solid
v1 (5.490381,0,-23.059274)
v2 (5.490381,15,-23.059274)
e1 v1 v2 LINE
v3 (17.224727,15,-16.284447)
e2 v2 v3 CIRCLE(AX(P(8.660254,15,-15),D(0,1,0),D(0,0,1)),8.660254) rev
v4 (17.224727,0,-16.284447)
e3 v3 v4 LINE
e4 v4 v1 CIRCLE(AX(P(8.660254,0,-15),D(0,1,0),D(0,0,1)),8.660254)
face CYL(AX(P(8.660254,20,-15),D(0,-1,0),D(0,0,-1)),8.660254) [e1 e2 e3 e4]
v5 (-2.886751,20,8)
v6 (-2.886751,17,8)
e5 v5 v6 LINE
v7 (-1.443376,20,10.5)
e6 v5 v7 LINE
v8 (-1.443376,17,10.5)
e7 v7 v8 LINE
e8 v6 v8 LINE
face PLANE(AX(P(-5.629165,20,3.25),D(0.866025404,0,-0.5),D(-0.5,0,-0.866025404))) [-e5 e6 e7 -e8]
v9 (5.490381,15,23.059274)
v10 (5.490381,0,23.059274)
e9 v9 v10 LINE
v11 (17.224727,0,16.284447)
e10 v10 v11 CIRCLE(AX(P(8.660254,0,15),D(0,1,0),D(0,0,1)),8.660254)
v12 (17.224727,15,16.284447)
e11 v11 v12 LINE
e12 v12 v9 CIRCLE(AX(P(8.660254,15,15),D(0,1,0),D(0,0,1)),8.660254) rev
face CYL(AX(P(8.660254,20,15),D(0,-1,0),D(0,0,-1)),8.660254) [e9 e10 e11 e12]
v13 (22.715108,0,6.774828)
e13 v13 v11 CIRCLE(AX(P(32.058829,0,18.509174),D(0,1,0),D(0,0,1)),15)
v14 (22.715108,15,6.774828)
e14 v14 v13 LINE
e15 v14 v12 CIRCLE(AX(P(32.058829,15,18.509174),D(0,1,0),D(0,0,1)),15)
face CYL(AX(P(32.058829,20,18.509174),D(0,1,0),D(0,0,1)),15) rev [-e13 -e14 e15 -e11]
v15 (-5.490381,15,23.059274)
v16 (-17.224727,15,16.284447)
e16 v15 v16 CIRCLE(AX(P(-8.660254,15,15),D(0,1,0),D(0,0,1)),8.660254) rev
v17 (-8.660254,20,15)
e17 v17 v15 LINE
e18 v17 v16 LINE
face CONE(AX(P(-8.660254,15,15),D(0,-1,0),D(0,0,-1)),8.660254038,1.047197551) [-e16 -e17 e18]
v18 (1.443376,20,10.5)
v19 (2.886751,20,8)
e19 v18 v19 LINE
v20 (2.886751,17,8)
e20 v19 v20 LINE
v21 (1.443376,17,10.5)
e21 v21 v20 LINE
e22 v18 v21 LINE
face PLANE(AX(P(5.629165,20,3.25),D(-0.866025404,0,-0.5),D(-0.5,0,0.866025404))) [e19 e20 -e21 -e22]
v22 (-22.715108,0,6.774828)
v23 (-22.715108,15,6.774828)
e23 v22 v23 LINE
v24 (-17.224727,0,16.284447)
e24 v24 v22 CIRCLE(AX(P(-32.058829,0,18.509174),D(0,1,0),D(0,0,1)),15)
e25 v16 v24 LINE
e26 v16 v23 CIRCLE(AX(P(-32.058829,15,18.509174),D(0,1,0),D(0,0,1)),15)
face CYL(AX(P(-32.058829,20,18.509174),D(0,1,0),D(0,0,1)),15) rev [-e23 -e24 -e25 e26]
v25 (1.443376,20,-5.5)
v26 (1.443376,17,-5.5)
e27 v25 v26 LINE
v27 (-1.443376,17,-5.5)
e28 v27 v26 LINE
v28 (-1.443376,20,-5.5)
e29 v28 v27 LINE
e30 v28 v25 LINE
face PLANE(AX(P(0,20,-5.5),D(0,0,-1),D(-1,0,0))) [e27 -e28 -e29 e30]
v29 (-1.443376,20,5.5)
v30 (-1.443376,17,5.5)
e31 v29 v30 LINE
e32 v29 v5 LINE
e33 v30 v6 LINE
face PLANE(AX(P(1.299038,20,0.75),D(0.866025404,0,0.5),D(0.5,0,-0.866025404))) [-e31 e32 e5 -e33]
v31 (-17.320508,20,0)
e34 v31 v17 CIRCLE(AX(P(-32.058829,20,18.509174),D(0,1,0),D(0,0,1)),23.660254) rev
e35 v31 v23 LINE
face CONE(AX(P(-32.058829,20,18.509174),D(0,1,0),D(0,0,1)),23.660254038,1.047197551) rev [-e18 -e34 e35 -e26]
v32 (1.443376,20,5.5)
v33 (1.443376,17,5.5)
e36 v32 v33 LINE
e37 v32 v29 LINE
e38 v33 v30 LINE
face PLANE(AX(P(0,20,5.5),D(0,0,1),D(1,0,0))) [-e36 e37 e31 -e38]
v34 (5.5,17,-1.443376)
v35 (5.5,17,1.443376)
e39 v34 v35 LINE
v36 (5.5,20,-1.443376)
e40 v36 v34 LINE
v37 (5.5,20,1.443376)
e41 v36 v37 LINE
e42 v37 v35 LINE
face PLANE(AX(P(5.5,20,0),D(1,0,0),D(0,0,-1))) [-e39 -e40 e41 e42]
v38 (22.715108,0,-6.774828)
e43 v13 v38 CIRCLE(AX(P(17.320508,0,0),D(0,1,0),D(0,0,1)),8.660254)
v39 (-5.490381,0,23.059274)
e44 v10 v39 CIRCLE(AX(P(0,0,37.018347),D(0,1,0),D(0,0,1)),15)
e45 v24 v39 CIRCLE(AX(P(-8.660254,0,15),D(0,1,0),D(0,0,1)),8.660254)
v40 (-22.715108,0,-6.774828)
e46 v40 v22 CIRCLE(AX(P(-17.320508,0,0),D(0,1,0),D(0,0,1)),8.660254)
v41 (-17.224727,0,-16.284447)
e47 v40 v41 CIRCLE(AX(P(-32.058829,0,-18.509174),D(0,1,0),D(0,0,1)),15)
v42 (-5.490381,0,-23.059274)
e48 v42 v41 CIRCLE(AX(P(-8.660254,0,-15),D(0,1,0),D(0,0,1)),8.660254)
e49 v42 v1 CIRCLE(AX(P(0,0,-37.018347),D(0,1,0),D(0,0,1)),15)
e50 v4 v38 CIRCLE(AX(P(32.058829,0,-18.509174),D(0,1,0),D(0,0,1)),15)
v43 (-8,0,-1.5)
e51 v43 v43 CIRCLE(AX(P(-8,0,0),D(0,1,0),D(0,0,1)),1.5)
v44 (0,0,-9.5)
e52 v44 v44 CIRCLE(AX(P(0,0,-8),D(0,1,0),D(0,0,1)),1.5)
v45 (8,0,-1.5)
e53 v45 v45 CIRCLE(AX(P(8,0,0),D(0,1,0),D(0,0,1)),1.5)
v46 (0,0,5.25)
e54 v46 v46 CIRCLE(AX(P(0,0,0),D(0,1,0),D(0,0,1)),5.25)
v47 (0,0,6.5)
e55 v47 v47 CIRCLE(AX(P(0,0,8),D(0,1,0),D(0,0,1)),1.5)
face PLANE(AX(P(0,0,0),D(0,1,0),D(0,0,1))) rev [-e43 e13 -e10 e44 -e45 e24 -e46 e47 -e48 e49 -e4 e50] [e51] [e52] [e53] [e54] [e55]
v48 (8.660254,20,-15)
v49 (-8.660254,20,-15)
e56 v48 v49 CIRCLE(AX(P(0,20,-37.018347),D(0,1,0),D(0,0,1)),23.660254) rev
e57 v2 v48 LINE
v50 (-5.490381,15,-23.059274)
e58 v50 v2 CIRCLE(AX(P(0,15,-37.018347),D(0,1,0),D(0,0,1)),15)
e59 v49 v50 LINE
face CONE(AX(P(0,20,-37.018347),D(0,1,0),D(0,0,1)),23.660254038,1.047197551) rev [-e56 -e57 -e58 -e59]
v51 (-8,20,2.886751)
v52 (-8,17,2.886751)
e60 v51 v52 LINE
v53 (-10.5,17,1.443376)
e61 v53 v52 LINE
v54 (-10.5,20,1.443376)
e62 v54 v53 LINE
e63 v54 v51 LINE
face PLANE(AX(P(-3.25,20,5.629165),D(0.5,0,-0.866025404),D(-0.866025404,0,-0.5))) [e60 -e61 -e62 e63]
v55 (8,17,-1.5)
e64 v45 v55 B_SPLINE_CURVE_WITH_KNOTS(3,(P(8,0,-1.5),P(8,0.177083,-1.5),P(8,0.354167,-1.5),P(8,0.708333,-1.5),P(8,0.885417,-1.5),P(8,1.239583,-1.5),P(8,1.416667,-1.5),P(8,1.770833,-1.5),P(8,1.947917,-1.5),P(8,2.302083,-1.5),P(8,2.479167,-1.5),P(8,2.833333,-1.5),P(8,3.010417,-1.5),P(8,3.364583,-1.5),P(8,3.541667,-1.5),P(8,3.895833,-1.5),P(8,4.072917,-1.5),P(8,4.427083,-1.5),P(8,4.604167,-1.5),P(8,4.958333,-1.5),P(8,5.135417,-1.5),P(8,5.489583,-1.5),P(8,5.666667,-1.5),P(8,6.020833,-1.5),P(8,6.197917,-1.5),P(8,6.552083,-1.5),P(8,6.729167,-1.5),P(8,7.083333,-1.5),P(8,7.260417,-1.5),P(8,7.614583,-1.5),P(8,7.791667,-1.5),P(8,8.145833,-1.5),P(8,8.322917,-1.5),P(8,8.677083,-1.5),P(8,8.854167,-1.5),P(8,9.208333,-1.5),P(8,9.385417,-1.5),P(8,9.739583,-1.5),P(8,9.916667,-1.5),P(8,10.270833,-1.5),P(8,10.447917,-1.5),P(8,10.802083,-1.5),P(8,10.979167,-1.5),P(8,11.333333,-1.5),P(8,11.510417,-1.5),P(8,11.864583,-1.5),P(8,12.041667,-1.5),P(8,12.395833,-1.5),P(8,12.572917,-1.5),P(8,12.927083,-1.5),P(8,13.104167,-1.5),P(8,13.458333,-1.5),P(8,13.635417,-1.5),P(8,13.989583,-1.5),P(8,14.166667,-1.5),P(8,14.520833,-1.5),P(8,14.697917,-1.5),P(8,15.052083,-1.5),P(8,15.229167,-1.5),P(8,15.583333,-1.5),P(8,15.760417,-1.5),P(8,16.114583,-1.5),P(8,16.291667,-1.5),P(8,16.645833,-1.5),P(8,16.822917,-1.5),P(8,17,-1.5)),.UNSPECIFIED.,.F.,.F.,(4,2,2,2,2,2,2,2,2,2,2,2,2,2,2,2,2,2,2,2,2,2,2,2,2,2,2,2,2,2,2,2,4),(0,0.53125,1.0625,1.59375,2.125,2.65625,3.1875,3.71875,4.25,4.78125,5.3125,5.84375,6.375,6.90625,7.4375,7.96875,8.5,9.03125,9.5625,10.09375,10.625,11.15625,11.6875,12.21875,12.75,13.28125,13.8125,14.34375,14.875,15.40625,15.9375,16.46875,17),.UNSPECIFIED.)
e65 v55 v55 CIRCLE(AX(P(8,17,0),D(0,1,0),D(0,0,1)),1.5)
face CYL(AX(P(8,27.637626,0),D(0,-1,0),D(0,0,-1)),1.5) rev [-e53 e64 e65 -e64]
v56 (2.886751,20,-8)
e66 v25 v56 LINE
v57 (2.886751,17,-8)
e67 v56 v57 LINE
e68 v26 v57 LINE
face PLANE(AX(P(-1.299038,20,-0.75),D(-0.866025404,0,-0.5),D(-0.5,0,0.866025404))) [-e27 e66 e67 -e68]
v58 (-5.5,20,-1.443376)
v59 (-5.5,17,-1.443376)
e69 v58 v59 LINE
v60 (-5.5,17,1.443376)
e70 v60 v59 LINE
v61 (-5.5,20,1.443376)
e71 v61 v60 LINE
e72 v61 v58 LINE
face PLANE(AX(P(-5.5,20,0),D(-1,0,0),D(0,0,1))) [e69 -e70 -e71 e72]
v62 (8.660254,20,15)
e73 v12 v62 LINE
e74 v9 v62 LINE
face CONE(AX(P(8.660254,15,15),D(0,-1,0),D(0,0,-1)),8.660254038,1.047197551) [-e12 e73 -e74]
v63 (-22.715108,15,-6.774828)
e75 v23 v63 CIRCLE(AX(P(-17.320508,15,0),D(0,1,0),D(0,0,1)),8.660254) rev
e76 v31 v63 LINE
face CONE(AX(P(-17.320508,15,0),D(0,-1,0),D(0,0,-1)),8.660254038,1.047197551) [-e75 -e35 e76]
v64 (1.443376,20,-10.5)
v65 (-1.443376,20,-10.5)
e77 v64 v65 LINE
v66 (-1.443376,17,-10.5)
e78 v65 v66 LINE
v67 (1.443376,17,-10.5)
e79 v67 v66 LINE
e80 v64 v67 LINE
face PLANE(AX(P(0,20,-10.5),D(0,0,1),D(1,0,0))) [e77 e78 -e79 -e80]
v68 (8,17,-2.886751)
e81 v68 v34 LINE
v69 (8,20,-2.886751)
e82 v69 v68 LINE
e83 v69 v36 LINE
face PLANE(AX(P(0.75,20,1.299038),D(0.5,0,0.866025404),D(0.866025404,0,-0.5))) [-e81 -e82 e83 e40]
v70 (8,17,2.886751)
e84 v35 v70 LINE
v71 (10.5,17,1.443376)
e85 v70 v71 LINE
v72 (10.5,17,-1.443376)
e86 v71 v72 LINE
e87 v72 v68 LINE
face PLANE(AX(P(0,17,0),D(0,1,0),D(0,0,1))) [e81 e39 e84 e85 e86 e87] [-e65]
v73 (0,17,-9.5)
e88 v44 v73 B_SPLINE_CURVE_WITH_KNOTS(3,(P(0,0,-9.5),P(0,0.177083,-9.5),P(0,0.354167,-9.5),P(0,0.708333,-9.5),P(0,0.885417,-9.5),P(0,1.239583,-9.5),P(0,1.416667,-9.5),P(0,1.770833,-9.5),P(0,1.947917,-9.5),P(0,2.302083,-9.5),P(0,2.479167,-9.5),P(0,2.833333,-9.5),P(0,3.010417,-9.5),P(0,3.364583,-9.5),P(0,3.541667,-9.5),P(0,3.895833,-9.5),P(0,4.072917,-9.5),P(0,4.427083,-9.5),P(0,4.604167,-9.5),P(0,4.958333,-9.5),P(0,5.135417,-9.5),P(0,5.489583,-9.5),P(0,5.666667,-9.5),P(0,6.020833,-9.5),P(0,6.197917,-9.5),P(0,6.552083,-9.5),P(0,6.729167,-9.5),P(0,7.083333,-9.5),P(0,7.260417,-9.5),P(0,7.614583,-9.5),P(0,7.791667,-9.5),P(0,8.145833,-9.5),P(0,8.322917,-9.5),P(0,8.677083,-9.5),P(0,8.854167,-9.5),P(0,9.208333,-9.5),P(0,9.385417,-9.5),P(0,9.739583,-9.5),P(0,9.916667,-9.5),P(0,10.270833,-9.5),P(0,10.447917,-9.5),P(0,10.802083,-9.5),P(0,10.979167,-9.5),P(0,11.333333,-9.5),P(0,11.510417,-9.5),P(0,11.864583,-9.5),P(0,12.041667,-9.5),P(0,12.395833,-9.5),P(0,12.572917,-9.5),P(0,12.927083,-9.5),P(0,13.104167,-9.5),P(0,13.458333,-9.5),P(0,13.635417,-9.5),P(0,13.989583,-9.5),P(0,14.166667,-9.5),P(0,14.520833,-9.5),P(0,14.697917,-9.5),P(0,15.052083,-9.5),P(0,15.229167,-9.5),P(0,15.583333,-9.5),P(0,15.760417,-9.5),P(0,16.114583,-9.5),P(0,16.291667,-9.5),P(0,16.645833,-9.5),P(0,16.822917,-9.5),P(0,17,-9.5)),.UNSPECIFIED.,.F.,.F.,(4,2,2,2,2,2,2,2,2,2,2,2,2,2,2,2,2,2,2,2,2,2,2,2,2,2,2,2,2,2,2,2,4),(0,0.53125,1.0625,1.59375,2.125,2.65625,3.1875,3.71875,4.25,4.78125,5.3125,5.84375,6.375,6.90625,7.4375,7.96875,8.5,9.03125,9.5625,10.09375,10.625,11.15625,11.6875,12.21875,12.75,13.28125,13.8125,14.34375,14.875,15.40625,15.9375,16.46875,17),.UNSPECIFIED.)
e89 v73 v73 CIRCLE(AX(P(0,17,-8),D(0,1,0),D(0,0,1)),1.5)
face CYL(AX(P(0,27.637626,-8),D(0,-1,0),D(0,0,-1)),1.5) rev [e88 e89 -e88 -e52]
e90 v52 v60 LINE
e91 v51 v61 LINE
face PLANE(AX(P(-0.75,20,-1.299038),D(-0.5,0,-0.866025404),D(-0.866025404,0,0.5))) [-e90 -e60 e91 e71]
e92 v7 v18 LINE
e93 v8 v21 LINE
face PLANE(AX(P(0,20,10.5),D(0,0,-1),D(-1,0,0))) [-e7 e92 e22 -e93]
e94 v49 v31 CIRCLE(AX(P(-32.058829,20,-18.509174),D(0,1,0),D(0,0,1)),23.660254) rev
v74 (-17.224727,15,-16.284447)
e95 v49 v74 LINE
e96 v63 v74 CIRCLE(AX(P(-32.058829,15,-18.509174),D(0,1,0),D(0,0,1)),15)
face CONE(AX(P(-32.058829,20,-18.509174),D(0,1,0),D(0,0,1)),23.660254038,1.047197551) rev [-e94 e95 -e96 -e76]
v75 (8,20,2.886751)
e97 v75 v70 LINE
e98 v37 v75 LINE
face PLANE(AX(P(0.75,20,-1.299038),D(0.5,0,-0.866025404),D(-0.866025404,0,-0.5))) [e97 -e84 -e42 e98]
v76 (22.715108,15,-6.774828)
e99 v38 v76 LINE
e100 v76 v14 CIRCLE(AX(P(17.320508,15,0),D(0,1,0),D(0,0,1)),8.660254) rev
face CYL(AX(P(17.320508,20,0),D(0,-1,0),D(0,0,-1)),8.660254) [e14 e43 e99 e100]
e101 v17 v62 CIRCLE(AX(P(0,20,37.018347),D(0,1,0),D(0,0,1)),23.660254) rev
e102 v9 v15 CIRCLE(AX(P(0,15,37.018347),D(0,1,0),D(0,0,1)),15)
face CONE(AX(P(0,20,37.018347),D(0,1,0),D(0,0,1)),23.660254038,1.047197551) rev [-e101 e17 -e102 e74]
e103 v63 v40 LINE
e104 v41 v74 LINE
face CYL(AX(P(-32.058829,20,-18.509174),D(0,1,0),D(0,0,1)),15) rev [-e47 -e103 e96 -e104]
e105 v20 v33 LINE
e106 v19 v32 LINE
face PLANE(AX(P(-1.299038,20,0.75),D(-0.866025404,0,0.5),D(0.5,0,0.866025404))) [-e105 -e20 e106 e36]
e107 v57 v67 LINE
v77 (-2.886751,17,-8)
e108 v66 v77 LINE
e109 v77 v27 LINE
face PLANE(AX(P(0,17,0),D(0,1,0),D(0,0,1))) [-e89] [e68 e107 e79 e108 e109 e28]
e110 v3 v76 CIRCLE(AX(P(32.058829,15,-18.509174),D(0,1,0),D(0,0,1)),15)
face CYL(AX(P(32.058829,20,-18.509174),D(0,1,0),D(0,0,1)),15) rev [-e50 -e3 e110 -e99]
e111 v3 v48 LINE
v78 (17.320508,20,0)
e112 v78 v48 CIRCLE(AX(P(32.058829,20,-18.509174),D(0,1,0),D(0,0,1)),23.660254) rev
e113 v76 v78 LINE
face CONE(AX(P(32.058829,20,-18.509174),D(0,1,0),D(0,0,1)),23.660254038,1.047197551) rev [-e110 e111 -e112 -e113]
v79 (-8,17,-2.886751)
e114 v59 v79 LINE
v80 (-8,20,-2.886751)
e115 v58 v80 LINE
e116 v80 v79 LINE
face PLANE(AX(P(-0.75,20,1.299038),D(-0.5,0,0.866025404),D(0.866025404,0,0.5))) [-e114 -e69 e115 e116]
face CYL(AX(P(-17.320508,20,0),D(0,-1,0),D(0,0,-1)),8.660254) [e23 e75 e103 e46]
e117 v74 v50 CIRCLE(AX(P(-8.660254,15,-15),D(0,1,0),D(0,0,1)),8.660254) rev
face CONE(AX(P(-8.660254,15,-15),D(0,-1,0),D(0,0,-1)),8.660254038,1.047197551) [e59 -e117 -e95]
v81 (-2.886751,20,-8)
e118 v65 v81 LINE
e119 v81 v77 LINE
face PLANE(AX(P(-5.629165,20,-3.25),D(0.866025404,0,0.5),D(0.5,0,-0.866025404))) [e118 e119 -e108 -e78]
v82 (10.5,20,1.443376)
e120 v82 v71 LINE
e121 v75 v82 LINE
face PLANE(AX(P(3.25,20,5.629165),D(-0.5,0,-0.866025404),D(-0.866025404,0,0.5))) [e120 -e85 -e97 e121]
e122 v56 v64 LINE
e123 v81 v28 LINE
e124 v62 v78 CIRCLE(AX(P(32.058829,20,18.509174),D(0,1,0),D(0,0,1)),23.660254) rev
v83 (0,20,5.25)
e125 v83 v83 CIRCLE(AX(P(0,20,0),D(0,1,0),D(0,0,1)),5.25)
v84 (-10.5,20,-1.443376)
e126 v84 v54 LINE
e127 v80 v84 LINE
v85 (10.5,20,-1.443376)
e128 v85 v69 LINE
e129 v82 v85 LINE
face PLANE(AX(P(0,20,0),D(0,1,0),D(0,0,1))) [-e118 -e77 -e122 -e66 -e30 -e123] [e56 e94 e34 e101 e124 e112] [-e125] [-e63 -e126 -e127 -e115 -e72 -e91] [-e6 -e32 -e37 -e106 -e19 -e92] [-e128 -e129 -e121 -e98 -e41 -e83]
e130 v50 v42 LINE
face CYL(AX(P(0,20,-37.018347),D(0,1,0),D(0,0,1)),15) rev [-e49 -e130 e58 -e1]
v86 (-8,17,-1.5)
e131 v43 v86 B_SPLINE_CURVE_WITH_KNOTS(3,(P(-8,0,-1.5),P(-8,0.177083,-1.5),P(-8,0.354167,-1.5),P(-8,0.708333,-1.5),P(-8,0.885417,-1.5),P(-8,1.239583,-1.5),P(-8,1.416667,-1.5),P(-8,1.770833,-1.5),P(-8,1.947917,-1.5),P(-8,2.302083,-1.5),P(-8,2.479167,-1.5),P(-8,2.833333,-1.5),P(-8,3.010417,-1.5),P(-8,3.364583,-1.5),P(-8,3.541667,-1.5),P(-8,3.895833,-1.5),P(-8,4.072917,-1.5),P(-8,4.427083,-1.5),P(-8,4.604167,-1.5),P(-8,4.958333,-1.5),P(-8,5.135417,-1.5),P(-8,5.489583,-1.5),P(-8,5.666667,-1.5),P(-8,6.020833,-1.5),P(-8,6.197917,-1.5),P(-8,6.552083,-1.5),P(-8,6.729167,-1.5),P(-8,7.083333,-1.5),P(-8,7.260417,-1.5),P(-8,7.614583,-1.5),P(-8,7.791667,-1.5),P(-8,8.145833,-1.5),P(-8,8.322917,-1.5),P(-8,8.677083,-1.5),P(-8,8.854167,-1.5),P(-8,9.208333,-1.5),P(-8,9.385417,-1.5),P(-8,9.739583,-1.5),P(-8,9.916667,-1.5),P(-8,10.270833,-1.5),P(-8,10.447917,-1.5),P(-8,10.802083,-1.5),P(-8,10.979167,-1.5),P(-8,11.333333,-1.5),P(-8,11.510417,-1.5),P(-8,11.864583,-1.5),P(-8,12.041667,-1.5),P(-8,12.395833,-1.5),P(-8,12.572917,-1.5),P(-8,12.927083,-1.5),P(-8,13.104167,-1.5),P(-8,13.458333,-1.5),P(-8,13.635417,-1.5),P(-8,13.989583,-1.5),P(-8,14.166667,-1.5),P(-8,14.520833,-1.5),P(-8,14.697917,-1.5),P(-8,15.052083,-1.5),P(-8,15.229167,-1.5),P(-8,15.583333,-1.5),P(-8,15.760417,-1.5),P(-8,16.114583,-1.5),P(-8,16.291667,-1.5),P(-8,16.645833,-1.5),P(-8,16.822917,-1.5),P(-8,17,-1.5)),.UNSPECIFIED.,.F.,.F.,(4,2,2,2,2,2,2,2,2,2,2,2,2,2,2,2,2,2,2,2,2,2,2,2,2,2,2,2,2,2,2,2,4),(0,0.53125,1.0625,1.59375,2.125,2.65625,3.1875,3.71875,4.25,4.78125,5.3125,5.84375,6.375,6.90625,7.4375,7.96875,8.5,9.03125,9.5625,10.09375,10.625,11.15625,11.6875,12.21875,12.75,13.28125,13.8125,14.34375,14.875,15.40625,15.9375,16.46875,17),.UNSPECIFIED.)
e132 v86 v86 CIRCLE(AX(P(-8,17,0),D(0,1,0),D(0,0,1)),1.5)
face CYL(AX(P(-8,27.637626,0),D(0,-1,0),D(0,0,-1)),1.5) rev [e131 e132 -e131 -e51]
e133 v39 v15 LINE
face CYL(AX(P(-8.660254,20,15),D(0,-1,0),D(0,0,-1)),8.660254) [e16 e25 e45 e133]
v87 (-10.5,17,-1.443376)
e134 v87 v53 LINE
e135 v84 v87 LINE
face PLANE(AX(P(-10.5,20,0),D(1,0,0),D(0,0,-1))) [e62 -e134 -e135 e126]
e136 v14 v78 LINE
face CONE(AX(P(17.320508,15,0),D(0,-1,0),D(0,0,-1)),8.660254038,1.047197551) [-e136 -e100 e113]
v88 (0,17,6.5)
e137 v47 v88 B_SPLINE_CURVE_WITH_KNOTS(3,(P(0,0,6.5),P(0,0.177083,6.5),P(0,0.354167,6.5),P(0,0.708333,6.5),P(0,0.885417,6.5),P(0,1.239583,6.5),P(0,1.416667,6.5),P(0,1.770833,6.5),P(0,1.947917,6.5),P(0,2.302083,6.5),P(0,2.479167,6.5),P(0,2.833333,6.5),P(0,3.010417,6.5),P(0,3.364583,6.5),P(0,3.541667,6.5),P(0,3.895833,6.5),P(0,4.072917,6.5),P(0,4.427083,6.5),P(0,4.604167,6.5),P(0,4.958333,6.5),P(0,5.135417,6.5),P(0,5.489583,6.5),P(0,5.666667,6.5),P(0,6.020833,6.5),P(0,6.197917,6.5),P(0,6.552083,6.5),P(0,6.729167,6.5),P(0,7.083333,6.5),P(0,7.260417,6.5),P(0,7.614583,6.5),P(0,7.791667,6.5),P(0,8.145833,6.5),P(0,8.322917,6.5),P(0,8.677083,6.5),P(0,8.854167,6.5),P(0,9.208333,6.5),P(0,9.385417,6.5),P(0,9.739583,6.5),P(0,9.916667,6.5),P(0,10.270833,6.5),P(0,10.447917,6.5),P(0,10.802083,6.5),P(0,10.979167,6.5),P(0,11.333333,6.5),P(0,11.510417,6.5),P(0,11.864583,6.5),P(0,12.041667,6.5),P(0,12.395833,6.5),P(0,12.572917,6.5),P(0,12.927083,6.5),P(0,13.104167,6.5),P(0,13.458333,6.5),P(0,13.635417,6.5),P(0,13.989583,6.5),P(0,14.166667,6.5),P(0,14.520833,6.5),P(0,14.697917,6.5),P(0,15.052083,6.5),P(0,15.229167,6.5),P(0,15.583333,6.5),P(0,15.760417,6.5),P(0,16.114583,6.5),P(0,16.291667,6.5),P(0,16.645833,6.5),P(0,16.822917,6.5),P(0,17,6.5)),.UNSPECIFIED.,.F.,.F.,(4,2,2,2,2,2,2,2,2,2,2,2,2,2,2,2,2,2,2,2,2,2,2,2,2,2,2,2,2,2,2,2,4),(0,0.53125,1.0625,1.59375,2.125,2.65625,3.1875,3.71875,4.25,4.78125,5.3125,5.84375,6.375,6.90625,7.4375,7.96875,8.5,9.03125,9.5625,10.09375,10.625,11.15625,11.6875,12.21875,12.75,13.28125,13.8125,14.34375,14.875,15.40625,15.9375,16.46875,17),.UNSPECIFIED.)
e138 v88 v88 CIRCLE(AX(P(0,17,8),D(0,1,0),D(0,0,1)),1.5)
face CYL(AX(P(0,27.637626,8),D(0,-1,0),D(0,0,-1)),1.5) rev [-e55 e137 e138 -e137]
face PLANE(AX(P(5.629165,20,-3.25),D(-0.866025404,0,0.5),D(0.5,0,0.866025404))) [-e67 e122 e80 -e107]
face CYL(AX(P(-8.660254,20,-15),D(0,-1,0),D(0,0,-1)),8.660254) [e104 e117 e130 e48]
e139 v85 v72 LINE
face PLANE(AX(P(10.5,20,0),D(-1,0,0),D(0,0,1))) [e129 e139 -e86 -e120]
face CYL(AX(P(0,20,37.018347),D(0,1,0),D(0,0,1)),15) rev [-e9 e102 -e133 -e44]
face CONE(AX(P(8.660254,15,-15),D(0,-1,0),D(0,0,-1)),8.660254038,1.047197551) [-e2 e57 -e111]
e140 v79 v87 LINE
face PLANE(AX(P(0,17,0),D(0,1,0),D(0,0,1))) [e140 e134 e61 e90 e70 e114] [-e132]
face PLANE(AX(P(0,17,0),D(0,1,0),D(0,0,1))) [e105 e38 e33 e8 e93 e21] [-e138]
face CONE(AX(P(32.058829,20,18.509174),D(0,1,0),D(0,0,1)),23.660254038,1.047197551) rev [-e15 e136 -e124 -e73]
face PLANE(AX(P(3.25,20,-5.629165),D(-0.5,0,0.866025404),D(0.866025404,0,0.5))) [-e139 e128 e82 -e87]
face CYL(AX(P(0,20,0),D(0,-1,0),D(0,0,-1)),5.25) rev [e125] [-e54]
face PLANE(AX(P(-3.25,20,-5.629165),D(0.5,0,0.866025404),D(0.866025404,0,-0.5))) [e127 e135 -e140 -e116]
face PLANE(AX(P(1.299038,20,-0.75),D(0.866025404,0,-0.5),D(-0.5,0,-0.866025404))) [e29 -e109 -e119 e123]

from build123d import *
from OCP.BRepFilletAPI import BRepFilletAPI_MakeChamfer

# Parameters (mm, degrees)
SKETCH1_R           = 5.25
BOSS_EXTRUDE1_DEPTH = 20
SKETCH1_3_R         = 1.5
BOSS_EXTRUDE2_DEPTH = 17
FILLET1_R           = 15
CHAMFER1_SIZE       = 8.660254038
CHAMFER1_SIZE_2     = 5


with BuildPart() as part:
    # Sketch1 → Boss-Extrude1 (new body)
    # profile 1 of 7: a face of its own
    with BuildSketch(Plane(origin=(0, 0, 0), x_dir=(1, 0, 0), z_dir=(0, 1, 0))):
        with BuildLine():
            Line((-17.320508076, 0), (-12.990381057, 7.5))
            ThreePointArc((-12.990381057, 7.5), (-25.980762114, 0), (-12.990381057, -7.5))
            Line((-12.990381057, -7.5), (-17.320508076, 0))
        make_face()
    # profile 2 of 7: a face of its own
    with BuildSketch(Plane(origin=(0, 0, 0), x_dir=(1, 0, 0), z_dir=(0, 1, 0))):
        Polygon((17.320508076, 0), (8.660254038, 15), (-8.660254038, 15), (-17.320508076, 0), (-8.660254038, -15), (8.660254038, -15), align=None)
        with Locations(Location((0, 0, 0), (0, 0, 270))):
            Circle(SKETCH1_R, mode=Mode.SUBTRACT)
        Polygon((1.443375673, -5.5), (-1.443375673, -5.5), (-2.886751346, -8), (-1.443375673, -10.5), (1.443375673, -10.5), (2.886751346, -8), align=None, mode=Mode.SUBTRACT)
        Polygon((8, 2.886751346), (5.5, 1.443375673), (5.5, -1.443375673), (8, -2.886751346), (10.5, -1.443375673), (10.5, 1.443375673), align=None, mode=Mode.SUBTRACT)
        Polygon((2.886751346, 8), (1.443375673, 10.5), (-1.443375673, 10.5), (-2.886751346, 8), (-1.443375673, 5.5), (1.443375673, 5.5), align=None, mode=Mode.SUBTRACT)
        Polygon((-8, 2.886751346), (-10.5, 1.443375673), (-10.5, -1.443375673), (-8, -2.886751346), (-5.5, -1.443375673), (-5.5, 1.443375673), align=None, mode=Mode.SUBTRACT)
    # profile 3 of 7: a face of its own
    with BuildSketch(Plane(origin=(0, 0, 0), x_dir=(1, 0, 0), z_dir=(0, 1, 0))):
        with BuildLine():
            Line((-12.990381057, 7.5), (-8.660254038, 15))
            Line((-8.660254038, 15), (0, 15))
            ThreePointArc((0, 15), (-12.990381057, 22.5), (-12.990381057, 7.5))
        make_face()
    # profile 4 of 7: a face of its own
    with BuildSketch(Plane(origin=(0, 0, 0), x_dir=(1, 0, 0), z_dir=(0, 1, 0))):
        with BuildLine():
            ThreePointArc((12.990381057, 7.5), (12.990381057, 22.5), (0, 15))
            Line((0, 15), (8.660254038, 15))
            Line((8.660254038, 15), (12.990381057, 7.5))
        make_face()
    # profile 5 of 7: a face of its own
    with BuildSketch(Plane(origin=(0, 0, 0), x_dir=(1, 0, 0), z_dir=(0, 1, 0))):
        with BuildLine():
            ThreePointArc((12.990381057, -7.5), (25.980762114, 0), (12.990381057, 7.5))
            Line((12.990381057, 7.5), (17.320508076, 0))
            Line((17.320508076, 0), (12.990381057, -7.5))
        make_face()
    # profile 6 of 7: a face of its own
    with BuildSketch(Plane(origin=(0, 0, 0), x_dir=(1, 0, 0), z_dir=(0, 1, 0))):
        with BuildLine():
            Line((8.660254038, -15), (0, -15))
            ThreePointArc((0, -15), (12.990381057, -22.5), (12.990381057, -7.5))
            Line((12.990381057, -7.5), (8.660254038, -15))
        make_face()
    # profile 7 of 7: a face of its own
    with BuildSketch(Plane(origin=(0, 0, 0), x_dir=(1, 0, 0), z_dir=(0, 1, 0))):
        with BuildLine():
            Line((-8.660254038, -15), (-12.990381057, -7.5))
            ThreePointArc((-12.990381057, -7.5), (-12.990381057, -22.5), (0, -15))
            Line((0, -15), (-8.660254038, -15))
        make_face()
    extrude(amount=BOSS_EXTRUDE1_DEPTH)

    # Sketch1<3> → Boss-Extrude2 (add)
    # profile 1 of 4: a face of its own
    with BuildSketch(Plane(origin=(0, 0, 0), x_dir=(1, 0, 0), z_dir=(0, 1, 0))):
        Polygon((-8.977463126, 2.322412747), (-10.5, 1.443375673), (-10.5, -1.443375673), (-8.977463126, -2.322412747), (-8, -2.886751346), (-5.5, -1.443375673), (-5.5, 1.443375673), (-8, 2.886751346), align=None)
        with Locations(Location((-8, 0, 0), (0, 0, 90))):
            Circle(SKETCH1_3_R, mode=Mode.SUBTRACT)
    # profile 2 of 4: a face of its own
    with BuildSketch(Plane(origin=(0, 0, 0), x_dir=(1, 0, 0), z_dir=(0, 1, 0))):
        Polygon((2.128194303, 9.313859338), (1.443375673, 10.5), (-1.443375673, 10.5), (-2.128194303, 9.313859338), (-2.886751346, 8), (-1.443375673, 5.5), (1.443375673, 5.5), (2.886751346, 8), align=None)
        with Locations(Location((0, 8, 0), (0, 0, 90))):
            Circle(SKETCH1_3_R, mode=Mode.SUBTRACT)
    # profile 3 of 4: a face of its own
    with BuildSketch(Plane(origin=(0, 0, 0), x_dir=(1, 0, 0), z_dir=(0, 1, 0))):
        Polygon((8, 2.886751346), (5.5, 1.443375673), (5.5, -1.443375673), (8, -2.886751346), (8.977463126, -2.322412747), (10.5, -1.443375673), (10.5, 1.443375673), (8.977463126, 2.322412747), align=None)
        with Locations(Location((8, 0, 0), (0, 0, 90))):
            Circle(SKETCH1_3_R, mode=Mode.SUBTRACT)
    # profile 4 of 4: a face of its own
    with BuildSketch(Plane(origin=(0, 0, 0), x_dir=(1, 0, 0), z_dir=(0, 1, 0))):
        Polygon((1.443375673, -5.5), (-1.443375673, -5.5), (-2.886751346, -8), (-2.128194303, -9.313859338), (-1.443375673, -10.5), (1.443375673, -10.5), (2.128194303, -9.313859338), (2.886751346, -8), align=None)
        with Locations(Location((0, -8, 0), (0, 0, 90))):
            Circle(SKETCH1_3_R, mode=Mode.SUBTRACT)
    extrude(amount=BOSS_EXTRUDE2_DEPTH)

    # Fillet1
    fillet1_edges = [part.edges().sort_by_distance(p)[0] for p in [
        (12.990381057, 10, 7.5),
        (0, 10, 15),
        (-12.990381057, 10, 7.5),
        (-12.990381057, 10, -7.5),
        (0, 10, -15),
        (12.990381057, 10, -7.5),
    ]]
    fillet(fillet1_edges, radius=FILLET1_R)

    # Chamfer1
    chamfer1_edges_1 = [part.edges().sort_by_distance(p)[0] for p in [
        (12.990381057, 20, 22.5),
    ]]
    chamfer1_side_1 = [part.faces().sort_by_distance(p)[0] for p in [
        (12.940381057, 20, 22.41339746),
    ]]
    chamfer1_edges_2 = [part.edges().sort_by_distance(p)[0] for p in [
        (-12.990381057, 20, 22.5),
    ]]
    chamfer1_side_2 = [part.faces().sort_by_distance(p)[0] for p in [
        (-12.940381057, 20, 22.41339746),
    ]]
    chamfer1_edges_3 = [part.edges().sort_by_distance(p)[0] for p in [
        (25.980762114, 20, 0),
    ]]
    chamfer1_side_3 = [part.faces().sort_by_distance(p)[0] for p in [
        (25.880762114, 20, 0),
    ]]
    chamfer1_edges_4 = [part.edges().sort_by_distance(p)[0] for p in [
        (12.990381057, 20, -22.5),
    ]]
    chamfer1_side_4 = [part.faces().sort_by_distance(p)[0] for p in [
        (12.940381057, 20, -22.41339746),
    ]]
    chamfer1_edges_5 = [part.edges().sort_by_distance(p)[0] for p in [
        (-12.990381057, 20, -22.5),
    ]]
    chamfer1_side_5 = [part.faces().sort_by_distance(p)[0] for p in [
        (-12.940381057, 20, -22.41339746),
    ]]
    chamfer1_edges_6 = [part.edges().sort_by_distance(p)[0] for p in [
        (-25.980762114, 20, 0),
    ]]
    chamfer1_side_6 = [part.faces().sort_by_distance(p)[0] for p in [
        (-25.980762114, 19.9, 0),
    ]]
    chamfer1_edges_7 = [part.edges().sort_by_distance(p)[0] for p in [
        (0, 20, 22.018347375),
    ]]
    chamfer1_side_7 = [part.faces().sort_by_distance(p)[0] for p in [
        (0, 20, 21.918347375),
    ]]
    chamfer1_edges_8 = [part.edges().sort_by_distance(p)[0] for p in [
        (19.068448176, 20, 11.009173688),
    ]]
    chamfer1_side_8 = [part.faces().sort_by_distance(p)[0] for p in [
        (18.981845636, 20, 10.959173688),
    ]]
    chamfer1_edges_9 = [part.edges().sort_by_distance(p)[0] for p in [
        (19.068448176, 20, -11.009173688),
    ]]
    chamfer1_side_9 = [part.faces().sort_by_distance(p)[0] for p in [
        (18.981845636, 20, -10.959173688),
    ]]
    chamfer1_edges_10 = [part.edges().sort_by_distance(p)[0] for p in [
        (0, 20, -22.018347375),
    ]]
    chamfer1_side_10 = [part.faces().sort_by_distance(p)[0] for p in [
        (0, 20, -21.918347375),
    ]]
    chamfer1_edges_11 = [part.edges().sort_by_distance(p)[0] for p in [
        (-19.068448176, 20, -11.009173688),
    ]]
    chamfer1_side_11 = [part.faces().sort_by_distance(p)[0] for p in [
        (-19.068448176, 19.9, -11.009173688),
    ]]
    chamfer1_edges_12 = [part.edges().sort_by_distance(p)[0] for p in [
        (-19.068448176, 20, 11.009173688),
    ]]
    chamfer1_side_12 = [part.faces().sort_by_distance(p)[0] for p in [
        (-19.068448176, 19.9, 11.009173688),
    ]]
    chamfer1 = BRepFilletAPI_MakeChamfer(part.part.solid().wrapped)
    for e in chamfer1_edges_1:
        chamfer1.Add(CHAMFER1_SIZE - 0.0001, CHAMFER1_SIZE_2 - 0.0001, e.wrapped, chamfer1_side_1[0].wrapped)
    for e in chamfer1_edges_2:
        chamfer1.Add(CHAMFER1_SIZE - 0.0001, CHAMFER1_SIZE_2 - 0.0001, e.wrapped, chamfer1_side_2[0].wrapped)
    for e in chamfer1_edges_3:
        chamfer1.Add(CHAMFER1_SIZE - 0.0001, CHAMFER1_SIZE_2 - 0.0001, e.wrapped, chamfer1_side_3[0].wrapped)
    for e in chamfer1_edges_4:
        chamfer1.Add(CHAMFER1_SIZE - 0.0001, CHAMFER1_SIZE_2 - 0.0001, e.wrapped, chamfer1_side_4[0].wrapped)
    for e in chamfer1_edges_5:
        chamfer1.Add(CHAMFER1_SIZE - 0.0001, CHAMFER1_SIZE_2 - 0.0001, e.wrapped, chamfer1_side_5[0].wrapped)
    for e in chamfer1_edges_6:
        chamfer1.Add(CHAMFER1_SIZE_2 - 0.0001, CHAMFER1_SIZE - 0.0001, e.wrapped, chamfer1_side_6[0].wrapped)
    for e in chamfer1_edges_7:
        chamfer1.Add(CHAMFER1_SIZE - 0.0001, CHAMFER1_SIZE_2 - 0.0001, e.wrapped, chamfer1_side_7[0].wrapped)
    for e in chamfer1_edges_8:
        chamfer1.Add(CHAMFER1_SIZE - 0.0001, CHAMFER1_SIZE_2 - 0.0001, e.wrapped, chamfer1_side_8[0].wrapped)
    for e in chamfer1_edges_9:
        chamfer1.Add(CHAMFER1_SIZE - 0.0001, CHAMFER1_SIZE_2 - 0.0001, e.wrapped, chamfer1_side_9[0].wrapped)
    for e in chamfer1_edges_10:
        chamfer1.Add(CHAMFER1_SIZE - 0.0001, CHAMFER1_SIZE_2 - 0.0001, e.wrapped, chamfer1_side_10[0].wrapped)
    for e in chamfer1_edges_11:
        chamfer1.Add(CHAMFER1_SIZE_2 - 0.0001, CHAMFER1_SIZE - 0.0001, e.wrapped, chamfer1_side_11[0].wrapped)
    for e in chamfer1_edges_12:
        chamfer1.Add(CHAMFER1_SIZE_2 - 0.0001, CHAMFER1_SIZE - 0.0001, e.wrapped, chamfer1_side_12[0].wrapped)
    add(Compound.cast(chamfer1.Shape()), mode=Mode.REPLACE)  # a hair under: the kernel refuses the full size


solid = part.part
